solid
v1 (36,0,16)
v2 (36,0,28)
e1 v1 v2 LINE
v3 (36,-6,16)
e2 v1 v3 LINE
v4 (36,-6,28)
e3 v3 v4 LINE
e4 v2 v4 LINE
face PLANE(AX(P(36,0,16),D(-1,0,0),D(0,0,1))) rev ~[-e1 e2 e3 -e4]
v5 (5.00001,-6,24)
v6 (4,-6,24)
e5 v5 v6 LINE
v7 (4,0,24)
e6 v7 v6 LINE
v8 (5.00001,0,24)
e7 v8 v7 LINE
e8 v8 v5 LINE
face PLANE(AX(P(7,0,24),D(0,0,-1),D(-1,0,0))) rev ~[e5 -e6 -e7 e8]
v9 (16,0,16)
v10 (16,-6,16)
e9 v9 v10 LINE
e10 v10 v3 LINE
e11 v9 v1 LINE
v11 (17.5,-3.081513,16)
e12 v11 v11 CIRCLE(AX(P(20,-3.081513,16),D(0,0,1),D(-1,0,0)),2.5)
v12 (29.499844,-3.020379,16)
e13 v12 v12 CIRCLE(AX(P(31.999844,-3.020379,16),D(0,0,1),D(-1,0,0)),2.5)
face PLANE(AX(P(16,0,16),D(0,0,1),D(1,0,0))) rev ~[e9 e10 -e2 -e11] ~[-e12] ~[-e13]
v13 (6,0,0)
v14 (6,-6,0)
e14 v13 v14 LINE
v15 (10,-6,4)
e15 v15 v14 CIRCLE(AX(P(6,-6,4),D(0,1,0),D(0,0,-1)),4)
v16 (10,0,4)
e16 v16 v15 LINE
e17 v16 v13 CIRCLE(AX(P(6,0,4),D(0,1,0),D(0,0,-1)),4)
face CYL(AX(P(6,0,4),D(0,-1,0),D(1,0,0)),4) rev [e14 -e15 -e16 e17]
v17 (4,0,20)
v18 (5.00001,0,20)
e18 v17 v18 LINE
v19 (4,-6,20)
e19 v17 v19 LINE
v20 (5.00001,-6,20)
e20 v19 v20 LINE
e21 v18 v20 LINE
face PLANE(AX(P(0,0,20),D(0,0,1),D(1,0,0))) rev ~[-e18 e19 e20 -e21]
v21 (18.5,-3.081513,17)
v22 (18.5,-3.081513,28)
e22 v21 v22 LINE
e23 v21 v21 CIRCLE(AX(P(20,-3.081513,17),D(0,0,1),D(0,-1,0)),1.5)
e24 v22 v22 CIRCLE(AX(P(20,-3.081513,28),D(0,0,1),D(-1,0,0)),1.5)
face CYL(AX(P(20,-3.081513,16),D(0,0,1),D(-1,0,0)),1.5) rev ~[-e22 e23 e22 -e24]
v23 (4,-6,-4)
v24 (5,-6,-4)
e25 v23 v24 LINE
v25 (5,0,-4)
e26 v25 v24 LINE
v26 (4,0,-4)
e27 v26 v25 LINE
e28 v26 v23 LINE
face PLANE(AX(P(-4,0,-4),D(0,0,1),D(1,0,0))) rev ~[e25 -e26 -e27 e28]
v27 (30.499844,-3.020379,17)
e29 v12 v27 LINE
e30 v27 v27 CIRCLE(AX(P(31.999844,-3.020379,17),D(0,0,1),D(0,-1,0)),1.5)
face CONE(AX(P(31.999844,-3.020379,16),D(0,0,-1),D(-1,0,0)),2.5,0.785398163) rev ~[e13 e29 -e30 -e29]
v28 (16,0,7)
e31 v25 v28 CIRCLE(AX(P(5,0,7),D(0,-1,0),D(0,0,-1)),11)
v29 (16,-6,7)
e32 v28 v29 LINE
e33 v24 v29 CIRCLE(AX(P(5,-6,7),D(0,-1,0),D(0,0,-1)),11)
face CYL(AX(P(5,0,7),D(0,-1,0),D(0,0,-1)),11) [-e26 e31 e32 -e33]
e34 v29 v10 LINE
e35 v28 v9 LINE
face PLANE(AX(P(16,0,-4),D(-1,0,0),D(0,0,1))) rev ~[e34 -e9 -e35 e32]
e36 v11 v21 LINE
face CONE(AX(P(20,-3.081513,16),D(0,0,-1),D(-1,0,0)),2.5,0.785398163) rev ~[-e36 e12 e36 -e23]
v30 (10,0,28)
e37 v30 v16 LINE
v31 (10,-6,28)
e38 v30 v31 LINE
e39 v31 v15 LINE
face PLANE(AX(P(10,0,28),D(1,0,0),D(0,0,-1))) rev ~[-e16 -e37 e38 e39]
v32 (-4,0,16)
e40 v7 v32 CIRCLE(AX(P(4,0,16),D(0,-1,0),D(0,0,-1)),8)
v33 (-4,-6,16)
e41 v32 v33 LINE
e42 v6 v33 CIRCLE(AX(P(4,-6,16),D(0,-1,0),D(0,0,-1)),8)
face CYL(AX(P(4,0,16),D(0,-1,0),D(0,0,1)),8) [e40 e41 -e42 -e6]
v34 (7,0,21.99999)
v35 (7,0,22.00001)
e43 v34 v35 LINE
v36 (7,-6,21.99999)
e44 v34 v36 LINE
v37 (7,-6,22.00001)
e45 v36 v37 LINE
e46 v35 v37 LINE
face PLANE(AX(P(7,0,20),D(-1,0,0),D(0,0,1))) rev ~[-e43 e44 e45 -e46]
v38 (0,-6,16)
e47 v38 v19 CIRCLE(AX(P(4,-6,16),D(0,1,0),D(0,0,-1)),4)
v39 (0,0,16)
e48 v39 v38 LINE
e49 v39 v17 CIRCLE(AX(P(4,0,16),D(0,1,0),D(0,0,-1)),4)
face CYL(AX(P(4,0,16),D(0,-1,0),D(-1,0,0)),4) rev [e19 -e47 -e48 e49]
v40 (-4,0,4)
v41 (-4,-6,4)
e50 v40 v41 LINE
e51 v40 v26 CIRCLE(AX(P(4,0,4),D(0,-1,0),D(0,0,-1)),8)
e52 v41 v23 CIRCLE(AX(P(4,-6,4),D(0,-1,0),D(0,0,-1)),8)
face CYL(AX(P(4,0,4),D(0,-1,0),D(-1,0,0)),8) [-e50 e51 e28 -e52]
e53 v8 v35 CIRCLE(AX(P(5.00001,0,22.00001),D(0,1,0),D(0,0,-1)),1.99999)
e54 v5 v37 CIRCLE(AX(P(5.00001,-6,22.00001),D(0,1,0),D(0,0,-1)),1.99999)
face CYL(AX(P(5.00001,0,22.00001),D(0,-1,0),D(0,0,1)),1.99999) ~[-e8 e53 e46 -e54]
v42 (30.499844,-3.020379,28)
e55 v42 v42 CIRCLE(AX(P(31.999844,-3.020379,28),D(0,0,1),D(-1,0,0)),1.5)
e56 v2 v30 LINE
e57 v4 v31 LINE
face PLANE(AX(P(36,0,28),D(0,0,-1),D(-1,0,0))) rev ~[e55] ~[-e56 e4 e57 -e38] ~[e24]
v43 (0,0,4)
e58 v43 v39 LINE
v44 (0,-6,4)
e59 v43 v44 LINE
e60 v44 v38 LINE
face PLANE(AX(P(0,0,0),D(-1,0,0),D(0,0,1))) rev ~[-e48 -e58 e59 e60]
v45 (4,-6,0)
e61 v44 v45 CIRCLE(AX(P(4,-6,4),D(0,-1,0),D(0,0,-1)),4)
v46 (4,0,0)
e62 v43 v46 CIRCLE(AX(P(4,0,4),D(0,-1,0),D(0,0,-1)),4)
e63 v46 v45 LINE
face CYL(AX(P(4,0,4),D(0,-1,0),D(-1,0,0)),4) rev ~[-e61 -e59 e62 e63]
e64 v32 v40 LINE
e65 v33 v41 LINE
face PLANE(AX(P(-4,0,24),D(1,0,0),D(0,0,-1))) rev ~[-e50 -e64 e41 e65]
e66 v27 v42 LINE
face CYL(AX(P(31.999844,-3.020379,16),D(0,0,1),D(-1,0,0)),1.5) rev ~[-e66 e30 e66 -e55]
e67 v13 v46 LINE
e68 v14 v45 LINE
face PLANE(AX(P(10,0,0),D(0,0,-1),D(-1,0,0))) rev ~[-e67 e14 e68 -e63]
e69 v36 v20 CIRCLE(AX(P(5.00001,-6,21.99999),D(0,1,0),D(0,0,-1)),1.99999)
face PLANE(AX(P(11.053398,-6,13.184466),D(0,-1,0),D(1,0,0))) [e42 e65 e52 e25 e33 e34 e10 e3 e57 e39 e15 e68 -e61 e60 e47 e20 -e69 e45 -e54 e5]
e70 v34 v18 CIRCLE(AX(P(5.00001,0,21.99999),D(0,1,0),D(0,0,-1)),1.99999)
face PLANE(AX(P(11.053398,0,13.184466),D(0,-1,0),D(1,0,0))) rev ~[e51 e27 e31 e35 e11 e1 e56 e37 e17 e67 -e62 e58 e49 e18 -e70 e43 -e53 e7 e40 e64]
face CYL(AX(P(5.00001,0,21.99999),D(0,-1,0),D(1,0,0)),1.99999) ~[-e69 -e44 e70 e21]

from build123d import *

# Parameters (mm, degrees)
F1_DEPTH       = 6
F2_R           = 4
F3_R           = 8
F4_R           = 11
F5_R           = 1.99999
F7_D           = 3
F7_CSINK_D     = 5
F7_CSINK_ANGLE = 90


# Not quite as in the source:
# - a fillet or chamfer is up to 0.001 mm smaller than in the source, because OpenCascade refuses the exact size


with BuildPart() as f1:
    # F0 (on Front) → F1 (new body)
    with BuildSketch(Plane.XZ):
        Polygon((0, 0), (0, 20), (7, 20), (7, 24), (-4, 24), (-4, -4), (16, -4), (16, 16), (36, 16), (36, 28), (10, 28), (10, 0), align=None)
    extrude(amount=F1_DEPTH)

    # F2
    f2_edges = [f1.edges().sort_by_distance(p)[0] for p in [
        (10, -3, 0),
        (0, -3, 0),
        (0, -3, 20),
    ]]
    fillet(f2_edges, radius=F2_R)

    # F3
    f3_edges = [f1.edges().sort_by_distance(p)[0] for p in [
        (-4, -3, 24),
        (-4, -3, -4),
    ]]
    fillet(f3_edges, radius=F3_R)

    # F4
    f4_edges = [f1.edges().sort_by_distance(p)[0] for p in [
        (16, -3, -4),
    ]]
    fillet(f4_edges, radius=F4_R)

    # F5 (radius 2 in the source; OpenCascade refuses exactly that, so slightly less here)
    f5_edges = [f1.edges().sort_by_distance(p)[0] for p in [
        (7, -3, 24),
        (7, -3, 20),
    ]]
    fillet(f5_edges, radius=F5_R)

    # F7 (through all)
    with Locations(Plane(origin=(0, 0, 16), x_dir=(1, 0, 0), z_dir=(0, 0, -1))):
        with Locations((20, 3.0815127769), (31.9998442765, 3.0203789876)):
            CounterSinkHole(F7_D / 2, F7_CSINK_D / 2, counter_sink_angle=F7_CSINK_ANGLE)


solid = f1.part
